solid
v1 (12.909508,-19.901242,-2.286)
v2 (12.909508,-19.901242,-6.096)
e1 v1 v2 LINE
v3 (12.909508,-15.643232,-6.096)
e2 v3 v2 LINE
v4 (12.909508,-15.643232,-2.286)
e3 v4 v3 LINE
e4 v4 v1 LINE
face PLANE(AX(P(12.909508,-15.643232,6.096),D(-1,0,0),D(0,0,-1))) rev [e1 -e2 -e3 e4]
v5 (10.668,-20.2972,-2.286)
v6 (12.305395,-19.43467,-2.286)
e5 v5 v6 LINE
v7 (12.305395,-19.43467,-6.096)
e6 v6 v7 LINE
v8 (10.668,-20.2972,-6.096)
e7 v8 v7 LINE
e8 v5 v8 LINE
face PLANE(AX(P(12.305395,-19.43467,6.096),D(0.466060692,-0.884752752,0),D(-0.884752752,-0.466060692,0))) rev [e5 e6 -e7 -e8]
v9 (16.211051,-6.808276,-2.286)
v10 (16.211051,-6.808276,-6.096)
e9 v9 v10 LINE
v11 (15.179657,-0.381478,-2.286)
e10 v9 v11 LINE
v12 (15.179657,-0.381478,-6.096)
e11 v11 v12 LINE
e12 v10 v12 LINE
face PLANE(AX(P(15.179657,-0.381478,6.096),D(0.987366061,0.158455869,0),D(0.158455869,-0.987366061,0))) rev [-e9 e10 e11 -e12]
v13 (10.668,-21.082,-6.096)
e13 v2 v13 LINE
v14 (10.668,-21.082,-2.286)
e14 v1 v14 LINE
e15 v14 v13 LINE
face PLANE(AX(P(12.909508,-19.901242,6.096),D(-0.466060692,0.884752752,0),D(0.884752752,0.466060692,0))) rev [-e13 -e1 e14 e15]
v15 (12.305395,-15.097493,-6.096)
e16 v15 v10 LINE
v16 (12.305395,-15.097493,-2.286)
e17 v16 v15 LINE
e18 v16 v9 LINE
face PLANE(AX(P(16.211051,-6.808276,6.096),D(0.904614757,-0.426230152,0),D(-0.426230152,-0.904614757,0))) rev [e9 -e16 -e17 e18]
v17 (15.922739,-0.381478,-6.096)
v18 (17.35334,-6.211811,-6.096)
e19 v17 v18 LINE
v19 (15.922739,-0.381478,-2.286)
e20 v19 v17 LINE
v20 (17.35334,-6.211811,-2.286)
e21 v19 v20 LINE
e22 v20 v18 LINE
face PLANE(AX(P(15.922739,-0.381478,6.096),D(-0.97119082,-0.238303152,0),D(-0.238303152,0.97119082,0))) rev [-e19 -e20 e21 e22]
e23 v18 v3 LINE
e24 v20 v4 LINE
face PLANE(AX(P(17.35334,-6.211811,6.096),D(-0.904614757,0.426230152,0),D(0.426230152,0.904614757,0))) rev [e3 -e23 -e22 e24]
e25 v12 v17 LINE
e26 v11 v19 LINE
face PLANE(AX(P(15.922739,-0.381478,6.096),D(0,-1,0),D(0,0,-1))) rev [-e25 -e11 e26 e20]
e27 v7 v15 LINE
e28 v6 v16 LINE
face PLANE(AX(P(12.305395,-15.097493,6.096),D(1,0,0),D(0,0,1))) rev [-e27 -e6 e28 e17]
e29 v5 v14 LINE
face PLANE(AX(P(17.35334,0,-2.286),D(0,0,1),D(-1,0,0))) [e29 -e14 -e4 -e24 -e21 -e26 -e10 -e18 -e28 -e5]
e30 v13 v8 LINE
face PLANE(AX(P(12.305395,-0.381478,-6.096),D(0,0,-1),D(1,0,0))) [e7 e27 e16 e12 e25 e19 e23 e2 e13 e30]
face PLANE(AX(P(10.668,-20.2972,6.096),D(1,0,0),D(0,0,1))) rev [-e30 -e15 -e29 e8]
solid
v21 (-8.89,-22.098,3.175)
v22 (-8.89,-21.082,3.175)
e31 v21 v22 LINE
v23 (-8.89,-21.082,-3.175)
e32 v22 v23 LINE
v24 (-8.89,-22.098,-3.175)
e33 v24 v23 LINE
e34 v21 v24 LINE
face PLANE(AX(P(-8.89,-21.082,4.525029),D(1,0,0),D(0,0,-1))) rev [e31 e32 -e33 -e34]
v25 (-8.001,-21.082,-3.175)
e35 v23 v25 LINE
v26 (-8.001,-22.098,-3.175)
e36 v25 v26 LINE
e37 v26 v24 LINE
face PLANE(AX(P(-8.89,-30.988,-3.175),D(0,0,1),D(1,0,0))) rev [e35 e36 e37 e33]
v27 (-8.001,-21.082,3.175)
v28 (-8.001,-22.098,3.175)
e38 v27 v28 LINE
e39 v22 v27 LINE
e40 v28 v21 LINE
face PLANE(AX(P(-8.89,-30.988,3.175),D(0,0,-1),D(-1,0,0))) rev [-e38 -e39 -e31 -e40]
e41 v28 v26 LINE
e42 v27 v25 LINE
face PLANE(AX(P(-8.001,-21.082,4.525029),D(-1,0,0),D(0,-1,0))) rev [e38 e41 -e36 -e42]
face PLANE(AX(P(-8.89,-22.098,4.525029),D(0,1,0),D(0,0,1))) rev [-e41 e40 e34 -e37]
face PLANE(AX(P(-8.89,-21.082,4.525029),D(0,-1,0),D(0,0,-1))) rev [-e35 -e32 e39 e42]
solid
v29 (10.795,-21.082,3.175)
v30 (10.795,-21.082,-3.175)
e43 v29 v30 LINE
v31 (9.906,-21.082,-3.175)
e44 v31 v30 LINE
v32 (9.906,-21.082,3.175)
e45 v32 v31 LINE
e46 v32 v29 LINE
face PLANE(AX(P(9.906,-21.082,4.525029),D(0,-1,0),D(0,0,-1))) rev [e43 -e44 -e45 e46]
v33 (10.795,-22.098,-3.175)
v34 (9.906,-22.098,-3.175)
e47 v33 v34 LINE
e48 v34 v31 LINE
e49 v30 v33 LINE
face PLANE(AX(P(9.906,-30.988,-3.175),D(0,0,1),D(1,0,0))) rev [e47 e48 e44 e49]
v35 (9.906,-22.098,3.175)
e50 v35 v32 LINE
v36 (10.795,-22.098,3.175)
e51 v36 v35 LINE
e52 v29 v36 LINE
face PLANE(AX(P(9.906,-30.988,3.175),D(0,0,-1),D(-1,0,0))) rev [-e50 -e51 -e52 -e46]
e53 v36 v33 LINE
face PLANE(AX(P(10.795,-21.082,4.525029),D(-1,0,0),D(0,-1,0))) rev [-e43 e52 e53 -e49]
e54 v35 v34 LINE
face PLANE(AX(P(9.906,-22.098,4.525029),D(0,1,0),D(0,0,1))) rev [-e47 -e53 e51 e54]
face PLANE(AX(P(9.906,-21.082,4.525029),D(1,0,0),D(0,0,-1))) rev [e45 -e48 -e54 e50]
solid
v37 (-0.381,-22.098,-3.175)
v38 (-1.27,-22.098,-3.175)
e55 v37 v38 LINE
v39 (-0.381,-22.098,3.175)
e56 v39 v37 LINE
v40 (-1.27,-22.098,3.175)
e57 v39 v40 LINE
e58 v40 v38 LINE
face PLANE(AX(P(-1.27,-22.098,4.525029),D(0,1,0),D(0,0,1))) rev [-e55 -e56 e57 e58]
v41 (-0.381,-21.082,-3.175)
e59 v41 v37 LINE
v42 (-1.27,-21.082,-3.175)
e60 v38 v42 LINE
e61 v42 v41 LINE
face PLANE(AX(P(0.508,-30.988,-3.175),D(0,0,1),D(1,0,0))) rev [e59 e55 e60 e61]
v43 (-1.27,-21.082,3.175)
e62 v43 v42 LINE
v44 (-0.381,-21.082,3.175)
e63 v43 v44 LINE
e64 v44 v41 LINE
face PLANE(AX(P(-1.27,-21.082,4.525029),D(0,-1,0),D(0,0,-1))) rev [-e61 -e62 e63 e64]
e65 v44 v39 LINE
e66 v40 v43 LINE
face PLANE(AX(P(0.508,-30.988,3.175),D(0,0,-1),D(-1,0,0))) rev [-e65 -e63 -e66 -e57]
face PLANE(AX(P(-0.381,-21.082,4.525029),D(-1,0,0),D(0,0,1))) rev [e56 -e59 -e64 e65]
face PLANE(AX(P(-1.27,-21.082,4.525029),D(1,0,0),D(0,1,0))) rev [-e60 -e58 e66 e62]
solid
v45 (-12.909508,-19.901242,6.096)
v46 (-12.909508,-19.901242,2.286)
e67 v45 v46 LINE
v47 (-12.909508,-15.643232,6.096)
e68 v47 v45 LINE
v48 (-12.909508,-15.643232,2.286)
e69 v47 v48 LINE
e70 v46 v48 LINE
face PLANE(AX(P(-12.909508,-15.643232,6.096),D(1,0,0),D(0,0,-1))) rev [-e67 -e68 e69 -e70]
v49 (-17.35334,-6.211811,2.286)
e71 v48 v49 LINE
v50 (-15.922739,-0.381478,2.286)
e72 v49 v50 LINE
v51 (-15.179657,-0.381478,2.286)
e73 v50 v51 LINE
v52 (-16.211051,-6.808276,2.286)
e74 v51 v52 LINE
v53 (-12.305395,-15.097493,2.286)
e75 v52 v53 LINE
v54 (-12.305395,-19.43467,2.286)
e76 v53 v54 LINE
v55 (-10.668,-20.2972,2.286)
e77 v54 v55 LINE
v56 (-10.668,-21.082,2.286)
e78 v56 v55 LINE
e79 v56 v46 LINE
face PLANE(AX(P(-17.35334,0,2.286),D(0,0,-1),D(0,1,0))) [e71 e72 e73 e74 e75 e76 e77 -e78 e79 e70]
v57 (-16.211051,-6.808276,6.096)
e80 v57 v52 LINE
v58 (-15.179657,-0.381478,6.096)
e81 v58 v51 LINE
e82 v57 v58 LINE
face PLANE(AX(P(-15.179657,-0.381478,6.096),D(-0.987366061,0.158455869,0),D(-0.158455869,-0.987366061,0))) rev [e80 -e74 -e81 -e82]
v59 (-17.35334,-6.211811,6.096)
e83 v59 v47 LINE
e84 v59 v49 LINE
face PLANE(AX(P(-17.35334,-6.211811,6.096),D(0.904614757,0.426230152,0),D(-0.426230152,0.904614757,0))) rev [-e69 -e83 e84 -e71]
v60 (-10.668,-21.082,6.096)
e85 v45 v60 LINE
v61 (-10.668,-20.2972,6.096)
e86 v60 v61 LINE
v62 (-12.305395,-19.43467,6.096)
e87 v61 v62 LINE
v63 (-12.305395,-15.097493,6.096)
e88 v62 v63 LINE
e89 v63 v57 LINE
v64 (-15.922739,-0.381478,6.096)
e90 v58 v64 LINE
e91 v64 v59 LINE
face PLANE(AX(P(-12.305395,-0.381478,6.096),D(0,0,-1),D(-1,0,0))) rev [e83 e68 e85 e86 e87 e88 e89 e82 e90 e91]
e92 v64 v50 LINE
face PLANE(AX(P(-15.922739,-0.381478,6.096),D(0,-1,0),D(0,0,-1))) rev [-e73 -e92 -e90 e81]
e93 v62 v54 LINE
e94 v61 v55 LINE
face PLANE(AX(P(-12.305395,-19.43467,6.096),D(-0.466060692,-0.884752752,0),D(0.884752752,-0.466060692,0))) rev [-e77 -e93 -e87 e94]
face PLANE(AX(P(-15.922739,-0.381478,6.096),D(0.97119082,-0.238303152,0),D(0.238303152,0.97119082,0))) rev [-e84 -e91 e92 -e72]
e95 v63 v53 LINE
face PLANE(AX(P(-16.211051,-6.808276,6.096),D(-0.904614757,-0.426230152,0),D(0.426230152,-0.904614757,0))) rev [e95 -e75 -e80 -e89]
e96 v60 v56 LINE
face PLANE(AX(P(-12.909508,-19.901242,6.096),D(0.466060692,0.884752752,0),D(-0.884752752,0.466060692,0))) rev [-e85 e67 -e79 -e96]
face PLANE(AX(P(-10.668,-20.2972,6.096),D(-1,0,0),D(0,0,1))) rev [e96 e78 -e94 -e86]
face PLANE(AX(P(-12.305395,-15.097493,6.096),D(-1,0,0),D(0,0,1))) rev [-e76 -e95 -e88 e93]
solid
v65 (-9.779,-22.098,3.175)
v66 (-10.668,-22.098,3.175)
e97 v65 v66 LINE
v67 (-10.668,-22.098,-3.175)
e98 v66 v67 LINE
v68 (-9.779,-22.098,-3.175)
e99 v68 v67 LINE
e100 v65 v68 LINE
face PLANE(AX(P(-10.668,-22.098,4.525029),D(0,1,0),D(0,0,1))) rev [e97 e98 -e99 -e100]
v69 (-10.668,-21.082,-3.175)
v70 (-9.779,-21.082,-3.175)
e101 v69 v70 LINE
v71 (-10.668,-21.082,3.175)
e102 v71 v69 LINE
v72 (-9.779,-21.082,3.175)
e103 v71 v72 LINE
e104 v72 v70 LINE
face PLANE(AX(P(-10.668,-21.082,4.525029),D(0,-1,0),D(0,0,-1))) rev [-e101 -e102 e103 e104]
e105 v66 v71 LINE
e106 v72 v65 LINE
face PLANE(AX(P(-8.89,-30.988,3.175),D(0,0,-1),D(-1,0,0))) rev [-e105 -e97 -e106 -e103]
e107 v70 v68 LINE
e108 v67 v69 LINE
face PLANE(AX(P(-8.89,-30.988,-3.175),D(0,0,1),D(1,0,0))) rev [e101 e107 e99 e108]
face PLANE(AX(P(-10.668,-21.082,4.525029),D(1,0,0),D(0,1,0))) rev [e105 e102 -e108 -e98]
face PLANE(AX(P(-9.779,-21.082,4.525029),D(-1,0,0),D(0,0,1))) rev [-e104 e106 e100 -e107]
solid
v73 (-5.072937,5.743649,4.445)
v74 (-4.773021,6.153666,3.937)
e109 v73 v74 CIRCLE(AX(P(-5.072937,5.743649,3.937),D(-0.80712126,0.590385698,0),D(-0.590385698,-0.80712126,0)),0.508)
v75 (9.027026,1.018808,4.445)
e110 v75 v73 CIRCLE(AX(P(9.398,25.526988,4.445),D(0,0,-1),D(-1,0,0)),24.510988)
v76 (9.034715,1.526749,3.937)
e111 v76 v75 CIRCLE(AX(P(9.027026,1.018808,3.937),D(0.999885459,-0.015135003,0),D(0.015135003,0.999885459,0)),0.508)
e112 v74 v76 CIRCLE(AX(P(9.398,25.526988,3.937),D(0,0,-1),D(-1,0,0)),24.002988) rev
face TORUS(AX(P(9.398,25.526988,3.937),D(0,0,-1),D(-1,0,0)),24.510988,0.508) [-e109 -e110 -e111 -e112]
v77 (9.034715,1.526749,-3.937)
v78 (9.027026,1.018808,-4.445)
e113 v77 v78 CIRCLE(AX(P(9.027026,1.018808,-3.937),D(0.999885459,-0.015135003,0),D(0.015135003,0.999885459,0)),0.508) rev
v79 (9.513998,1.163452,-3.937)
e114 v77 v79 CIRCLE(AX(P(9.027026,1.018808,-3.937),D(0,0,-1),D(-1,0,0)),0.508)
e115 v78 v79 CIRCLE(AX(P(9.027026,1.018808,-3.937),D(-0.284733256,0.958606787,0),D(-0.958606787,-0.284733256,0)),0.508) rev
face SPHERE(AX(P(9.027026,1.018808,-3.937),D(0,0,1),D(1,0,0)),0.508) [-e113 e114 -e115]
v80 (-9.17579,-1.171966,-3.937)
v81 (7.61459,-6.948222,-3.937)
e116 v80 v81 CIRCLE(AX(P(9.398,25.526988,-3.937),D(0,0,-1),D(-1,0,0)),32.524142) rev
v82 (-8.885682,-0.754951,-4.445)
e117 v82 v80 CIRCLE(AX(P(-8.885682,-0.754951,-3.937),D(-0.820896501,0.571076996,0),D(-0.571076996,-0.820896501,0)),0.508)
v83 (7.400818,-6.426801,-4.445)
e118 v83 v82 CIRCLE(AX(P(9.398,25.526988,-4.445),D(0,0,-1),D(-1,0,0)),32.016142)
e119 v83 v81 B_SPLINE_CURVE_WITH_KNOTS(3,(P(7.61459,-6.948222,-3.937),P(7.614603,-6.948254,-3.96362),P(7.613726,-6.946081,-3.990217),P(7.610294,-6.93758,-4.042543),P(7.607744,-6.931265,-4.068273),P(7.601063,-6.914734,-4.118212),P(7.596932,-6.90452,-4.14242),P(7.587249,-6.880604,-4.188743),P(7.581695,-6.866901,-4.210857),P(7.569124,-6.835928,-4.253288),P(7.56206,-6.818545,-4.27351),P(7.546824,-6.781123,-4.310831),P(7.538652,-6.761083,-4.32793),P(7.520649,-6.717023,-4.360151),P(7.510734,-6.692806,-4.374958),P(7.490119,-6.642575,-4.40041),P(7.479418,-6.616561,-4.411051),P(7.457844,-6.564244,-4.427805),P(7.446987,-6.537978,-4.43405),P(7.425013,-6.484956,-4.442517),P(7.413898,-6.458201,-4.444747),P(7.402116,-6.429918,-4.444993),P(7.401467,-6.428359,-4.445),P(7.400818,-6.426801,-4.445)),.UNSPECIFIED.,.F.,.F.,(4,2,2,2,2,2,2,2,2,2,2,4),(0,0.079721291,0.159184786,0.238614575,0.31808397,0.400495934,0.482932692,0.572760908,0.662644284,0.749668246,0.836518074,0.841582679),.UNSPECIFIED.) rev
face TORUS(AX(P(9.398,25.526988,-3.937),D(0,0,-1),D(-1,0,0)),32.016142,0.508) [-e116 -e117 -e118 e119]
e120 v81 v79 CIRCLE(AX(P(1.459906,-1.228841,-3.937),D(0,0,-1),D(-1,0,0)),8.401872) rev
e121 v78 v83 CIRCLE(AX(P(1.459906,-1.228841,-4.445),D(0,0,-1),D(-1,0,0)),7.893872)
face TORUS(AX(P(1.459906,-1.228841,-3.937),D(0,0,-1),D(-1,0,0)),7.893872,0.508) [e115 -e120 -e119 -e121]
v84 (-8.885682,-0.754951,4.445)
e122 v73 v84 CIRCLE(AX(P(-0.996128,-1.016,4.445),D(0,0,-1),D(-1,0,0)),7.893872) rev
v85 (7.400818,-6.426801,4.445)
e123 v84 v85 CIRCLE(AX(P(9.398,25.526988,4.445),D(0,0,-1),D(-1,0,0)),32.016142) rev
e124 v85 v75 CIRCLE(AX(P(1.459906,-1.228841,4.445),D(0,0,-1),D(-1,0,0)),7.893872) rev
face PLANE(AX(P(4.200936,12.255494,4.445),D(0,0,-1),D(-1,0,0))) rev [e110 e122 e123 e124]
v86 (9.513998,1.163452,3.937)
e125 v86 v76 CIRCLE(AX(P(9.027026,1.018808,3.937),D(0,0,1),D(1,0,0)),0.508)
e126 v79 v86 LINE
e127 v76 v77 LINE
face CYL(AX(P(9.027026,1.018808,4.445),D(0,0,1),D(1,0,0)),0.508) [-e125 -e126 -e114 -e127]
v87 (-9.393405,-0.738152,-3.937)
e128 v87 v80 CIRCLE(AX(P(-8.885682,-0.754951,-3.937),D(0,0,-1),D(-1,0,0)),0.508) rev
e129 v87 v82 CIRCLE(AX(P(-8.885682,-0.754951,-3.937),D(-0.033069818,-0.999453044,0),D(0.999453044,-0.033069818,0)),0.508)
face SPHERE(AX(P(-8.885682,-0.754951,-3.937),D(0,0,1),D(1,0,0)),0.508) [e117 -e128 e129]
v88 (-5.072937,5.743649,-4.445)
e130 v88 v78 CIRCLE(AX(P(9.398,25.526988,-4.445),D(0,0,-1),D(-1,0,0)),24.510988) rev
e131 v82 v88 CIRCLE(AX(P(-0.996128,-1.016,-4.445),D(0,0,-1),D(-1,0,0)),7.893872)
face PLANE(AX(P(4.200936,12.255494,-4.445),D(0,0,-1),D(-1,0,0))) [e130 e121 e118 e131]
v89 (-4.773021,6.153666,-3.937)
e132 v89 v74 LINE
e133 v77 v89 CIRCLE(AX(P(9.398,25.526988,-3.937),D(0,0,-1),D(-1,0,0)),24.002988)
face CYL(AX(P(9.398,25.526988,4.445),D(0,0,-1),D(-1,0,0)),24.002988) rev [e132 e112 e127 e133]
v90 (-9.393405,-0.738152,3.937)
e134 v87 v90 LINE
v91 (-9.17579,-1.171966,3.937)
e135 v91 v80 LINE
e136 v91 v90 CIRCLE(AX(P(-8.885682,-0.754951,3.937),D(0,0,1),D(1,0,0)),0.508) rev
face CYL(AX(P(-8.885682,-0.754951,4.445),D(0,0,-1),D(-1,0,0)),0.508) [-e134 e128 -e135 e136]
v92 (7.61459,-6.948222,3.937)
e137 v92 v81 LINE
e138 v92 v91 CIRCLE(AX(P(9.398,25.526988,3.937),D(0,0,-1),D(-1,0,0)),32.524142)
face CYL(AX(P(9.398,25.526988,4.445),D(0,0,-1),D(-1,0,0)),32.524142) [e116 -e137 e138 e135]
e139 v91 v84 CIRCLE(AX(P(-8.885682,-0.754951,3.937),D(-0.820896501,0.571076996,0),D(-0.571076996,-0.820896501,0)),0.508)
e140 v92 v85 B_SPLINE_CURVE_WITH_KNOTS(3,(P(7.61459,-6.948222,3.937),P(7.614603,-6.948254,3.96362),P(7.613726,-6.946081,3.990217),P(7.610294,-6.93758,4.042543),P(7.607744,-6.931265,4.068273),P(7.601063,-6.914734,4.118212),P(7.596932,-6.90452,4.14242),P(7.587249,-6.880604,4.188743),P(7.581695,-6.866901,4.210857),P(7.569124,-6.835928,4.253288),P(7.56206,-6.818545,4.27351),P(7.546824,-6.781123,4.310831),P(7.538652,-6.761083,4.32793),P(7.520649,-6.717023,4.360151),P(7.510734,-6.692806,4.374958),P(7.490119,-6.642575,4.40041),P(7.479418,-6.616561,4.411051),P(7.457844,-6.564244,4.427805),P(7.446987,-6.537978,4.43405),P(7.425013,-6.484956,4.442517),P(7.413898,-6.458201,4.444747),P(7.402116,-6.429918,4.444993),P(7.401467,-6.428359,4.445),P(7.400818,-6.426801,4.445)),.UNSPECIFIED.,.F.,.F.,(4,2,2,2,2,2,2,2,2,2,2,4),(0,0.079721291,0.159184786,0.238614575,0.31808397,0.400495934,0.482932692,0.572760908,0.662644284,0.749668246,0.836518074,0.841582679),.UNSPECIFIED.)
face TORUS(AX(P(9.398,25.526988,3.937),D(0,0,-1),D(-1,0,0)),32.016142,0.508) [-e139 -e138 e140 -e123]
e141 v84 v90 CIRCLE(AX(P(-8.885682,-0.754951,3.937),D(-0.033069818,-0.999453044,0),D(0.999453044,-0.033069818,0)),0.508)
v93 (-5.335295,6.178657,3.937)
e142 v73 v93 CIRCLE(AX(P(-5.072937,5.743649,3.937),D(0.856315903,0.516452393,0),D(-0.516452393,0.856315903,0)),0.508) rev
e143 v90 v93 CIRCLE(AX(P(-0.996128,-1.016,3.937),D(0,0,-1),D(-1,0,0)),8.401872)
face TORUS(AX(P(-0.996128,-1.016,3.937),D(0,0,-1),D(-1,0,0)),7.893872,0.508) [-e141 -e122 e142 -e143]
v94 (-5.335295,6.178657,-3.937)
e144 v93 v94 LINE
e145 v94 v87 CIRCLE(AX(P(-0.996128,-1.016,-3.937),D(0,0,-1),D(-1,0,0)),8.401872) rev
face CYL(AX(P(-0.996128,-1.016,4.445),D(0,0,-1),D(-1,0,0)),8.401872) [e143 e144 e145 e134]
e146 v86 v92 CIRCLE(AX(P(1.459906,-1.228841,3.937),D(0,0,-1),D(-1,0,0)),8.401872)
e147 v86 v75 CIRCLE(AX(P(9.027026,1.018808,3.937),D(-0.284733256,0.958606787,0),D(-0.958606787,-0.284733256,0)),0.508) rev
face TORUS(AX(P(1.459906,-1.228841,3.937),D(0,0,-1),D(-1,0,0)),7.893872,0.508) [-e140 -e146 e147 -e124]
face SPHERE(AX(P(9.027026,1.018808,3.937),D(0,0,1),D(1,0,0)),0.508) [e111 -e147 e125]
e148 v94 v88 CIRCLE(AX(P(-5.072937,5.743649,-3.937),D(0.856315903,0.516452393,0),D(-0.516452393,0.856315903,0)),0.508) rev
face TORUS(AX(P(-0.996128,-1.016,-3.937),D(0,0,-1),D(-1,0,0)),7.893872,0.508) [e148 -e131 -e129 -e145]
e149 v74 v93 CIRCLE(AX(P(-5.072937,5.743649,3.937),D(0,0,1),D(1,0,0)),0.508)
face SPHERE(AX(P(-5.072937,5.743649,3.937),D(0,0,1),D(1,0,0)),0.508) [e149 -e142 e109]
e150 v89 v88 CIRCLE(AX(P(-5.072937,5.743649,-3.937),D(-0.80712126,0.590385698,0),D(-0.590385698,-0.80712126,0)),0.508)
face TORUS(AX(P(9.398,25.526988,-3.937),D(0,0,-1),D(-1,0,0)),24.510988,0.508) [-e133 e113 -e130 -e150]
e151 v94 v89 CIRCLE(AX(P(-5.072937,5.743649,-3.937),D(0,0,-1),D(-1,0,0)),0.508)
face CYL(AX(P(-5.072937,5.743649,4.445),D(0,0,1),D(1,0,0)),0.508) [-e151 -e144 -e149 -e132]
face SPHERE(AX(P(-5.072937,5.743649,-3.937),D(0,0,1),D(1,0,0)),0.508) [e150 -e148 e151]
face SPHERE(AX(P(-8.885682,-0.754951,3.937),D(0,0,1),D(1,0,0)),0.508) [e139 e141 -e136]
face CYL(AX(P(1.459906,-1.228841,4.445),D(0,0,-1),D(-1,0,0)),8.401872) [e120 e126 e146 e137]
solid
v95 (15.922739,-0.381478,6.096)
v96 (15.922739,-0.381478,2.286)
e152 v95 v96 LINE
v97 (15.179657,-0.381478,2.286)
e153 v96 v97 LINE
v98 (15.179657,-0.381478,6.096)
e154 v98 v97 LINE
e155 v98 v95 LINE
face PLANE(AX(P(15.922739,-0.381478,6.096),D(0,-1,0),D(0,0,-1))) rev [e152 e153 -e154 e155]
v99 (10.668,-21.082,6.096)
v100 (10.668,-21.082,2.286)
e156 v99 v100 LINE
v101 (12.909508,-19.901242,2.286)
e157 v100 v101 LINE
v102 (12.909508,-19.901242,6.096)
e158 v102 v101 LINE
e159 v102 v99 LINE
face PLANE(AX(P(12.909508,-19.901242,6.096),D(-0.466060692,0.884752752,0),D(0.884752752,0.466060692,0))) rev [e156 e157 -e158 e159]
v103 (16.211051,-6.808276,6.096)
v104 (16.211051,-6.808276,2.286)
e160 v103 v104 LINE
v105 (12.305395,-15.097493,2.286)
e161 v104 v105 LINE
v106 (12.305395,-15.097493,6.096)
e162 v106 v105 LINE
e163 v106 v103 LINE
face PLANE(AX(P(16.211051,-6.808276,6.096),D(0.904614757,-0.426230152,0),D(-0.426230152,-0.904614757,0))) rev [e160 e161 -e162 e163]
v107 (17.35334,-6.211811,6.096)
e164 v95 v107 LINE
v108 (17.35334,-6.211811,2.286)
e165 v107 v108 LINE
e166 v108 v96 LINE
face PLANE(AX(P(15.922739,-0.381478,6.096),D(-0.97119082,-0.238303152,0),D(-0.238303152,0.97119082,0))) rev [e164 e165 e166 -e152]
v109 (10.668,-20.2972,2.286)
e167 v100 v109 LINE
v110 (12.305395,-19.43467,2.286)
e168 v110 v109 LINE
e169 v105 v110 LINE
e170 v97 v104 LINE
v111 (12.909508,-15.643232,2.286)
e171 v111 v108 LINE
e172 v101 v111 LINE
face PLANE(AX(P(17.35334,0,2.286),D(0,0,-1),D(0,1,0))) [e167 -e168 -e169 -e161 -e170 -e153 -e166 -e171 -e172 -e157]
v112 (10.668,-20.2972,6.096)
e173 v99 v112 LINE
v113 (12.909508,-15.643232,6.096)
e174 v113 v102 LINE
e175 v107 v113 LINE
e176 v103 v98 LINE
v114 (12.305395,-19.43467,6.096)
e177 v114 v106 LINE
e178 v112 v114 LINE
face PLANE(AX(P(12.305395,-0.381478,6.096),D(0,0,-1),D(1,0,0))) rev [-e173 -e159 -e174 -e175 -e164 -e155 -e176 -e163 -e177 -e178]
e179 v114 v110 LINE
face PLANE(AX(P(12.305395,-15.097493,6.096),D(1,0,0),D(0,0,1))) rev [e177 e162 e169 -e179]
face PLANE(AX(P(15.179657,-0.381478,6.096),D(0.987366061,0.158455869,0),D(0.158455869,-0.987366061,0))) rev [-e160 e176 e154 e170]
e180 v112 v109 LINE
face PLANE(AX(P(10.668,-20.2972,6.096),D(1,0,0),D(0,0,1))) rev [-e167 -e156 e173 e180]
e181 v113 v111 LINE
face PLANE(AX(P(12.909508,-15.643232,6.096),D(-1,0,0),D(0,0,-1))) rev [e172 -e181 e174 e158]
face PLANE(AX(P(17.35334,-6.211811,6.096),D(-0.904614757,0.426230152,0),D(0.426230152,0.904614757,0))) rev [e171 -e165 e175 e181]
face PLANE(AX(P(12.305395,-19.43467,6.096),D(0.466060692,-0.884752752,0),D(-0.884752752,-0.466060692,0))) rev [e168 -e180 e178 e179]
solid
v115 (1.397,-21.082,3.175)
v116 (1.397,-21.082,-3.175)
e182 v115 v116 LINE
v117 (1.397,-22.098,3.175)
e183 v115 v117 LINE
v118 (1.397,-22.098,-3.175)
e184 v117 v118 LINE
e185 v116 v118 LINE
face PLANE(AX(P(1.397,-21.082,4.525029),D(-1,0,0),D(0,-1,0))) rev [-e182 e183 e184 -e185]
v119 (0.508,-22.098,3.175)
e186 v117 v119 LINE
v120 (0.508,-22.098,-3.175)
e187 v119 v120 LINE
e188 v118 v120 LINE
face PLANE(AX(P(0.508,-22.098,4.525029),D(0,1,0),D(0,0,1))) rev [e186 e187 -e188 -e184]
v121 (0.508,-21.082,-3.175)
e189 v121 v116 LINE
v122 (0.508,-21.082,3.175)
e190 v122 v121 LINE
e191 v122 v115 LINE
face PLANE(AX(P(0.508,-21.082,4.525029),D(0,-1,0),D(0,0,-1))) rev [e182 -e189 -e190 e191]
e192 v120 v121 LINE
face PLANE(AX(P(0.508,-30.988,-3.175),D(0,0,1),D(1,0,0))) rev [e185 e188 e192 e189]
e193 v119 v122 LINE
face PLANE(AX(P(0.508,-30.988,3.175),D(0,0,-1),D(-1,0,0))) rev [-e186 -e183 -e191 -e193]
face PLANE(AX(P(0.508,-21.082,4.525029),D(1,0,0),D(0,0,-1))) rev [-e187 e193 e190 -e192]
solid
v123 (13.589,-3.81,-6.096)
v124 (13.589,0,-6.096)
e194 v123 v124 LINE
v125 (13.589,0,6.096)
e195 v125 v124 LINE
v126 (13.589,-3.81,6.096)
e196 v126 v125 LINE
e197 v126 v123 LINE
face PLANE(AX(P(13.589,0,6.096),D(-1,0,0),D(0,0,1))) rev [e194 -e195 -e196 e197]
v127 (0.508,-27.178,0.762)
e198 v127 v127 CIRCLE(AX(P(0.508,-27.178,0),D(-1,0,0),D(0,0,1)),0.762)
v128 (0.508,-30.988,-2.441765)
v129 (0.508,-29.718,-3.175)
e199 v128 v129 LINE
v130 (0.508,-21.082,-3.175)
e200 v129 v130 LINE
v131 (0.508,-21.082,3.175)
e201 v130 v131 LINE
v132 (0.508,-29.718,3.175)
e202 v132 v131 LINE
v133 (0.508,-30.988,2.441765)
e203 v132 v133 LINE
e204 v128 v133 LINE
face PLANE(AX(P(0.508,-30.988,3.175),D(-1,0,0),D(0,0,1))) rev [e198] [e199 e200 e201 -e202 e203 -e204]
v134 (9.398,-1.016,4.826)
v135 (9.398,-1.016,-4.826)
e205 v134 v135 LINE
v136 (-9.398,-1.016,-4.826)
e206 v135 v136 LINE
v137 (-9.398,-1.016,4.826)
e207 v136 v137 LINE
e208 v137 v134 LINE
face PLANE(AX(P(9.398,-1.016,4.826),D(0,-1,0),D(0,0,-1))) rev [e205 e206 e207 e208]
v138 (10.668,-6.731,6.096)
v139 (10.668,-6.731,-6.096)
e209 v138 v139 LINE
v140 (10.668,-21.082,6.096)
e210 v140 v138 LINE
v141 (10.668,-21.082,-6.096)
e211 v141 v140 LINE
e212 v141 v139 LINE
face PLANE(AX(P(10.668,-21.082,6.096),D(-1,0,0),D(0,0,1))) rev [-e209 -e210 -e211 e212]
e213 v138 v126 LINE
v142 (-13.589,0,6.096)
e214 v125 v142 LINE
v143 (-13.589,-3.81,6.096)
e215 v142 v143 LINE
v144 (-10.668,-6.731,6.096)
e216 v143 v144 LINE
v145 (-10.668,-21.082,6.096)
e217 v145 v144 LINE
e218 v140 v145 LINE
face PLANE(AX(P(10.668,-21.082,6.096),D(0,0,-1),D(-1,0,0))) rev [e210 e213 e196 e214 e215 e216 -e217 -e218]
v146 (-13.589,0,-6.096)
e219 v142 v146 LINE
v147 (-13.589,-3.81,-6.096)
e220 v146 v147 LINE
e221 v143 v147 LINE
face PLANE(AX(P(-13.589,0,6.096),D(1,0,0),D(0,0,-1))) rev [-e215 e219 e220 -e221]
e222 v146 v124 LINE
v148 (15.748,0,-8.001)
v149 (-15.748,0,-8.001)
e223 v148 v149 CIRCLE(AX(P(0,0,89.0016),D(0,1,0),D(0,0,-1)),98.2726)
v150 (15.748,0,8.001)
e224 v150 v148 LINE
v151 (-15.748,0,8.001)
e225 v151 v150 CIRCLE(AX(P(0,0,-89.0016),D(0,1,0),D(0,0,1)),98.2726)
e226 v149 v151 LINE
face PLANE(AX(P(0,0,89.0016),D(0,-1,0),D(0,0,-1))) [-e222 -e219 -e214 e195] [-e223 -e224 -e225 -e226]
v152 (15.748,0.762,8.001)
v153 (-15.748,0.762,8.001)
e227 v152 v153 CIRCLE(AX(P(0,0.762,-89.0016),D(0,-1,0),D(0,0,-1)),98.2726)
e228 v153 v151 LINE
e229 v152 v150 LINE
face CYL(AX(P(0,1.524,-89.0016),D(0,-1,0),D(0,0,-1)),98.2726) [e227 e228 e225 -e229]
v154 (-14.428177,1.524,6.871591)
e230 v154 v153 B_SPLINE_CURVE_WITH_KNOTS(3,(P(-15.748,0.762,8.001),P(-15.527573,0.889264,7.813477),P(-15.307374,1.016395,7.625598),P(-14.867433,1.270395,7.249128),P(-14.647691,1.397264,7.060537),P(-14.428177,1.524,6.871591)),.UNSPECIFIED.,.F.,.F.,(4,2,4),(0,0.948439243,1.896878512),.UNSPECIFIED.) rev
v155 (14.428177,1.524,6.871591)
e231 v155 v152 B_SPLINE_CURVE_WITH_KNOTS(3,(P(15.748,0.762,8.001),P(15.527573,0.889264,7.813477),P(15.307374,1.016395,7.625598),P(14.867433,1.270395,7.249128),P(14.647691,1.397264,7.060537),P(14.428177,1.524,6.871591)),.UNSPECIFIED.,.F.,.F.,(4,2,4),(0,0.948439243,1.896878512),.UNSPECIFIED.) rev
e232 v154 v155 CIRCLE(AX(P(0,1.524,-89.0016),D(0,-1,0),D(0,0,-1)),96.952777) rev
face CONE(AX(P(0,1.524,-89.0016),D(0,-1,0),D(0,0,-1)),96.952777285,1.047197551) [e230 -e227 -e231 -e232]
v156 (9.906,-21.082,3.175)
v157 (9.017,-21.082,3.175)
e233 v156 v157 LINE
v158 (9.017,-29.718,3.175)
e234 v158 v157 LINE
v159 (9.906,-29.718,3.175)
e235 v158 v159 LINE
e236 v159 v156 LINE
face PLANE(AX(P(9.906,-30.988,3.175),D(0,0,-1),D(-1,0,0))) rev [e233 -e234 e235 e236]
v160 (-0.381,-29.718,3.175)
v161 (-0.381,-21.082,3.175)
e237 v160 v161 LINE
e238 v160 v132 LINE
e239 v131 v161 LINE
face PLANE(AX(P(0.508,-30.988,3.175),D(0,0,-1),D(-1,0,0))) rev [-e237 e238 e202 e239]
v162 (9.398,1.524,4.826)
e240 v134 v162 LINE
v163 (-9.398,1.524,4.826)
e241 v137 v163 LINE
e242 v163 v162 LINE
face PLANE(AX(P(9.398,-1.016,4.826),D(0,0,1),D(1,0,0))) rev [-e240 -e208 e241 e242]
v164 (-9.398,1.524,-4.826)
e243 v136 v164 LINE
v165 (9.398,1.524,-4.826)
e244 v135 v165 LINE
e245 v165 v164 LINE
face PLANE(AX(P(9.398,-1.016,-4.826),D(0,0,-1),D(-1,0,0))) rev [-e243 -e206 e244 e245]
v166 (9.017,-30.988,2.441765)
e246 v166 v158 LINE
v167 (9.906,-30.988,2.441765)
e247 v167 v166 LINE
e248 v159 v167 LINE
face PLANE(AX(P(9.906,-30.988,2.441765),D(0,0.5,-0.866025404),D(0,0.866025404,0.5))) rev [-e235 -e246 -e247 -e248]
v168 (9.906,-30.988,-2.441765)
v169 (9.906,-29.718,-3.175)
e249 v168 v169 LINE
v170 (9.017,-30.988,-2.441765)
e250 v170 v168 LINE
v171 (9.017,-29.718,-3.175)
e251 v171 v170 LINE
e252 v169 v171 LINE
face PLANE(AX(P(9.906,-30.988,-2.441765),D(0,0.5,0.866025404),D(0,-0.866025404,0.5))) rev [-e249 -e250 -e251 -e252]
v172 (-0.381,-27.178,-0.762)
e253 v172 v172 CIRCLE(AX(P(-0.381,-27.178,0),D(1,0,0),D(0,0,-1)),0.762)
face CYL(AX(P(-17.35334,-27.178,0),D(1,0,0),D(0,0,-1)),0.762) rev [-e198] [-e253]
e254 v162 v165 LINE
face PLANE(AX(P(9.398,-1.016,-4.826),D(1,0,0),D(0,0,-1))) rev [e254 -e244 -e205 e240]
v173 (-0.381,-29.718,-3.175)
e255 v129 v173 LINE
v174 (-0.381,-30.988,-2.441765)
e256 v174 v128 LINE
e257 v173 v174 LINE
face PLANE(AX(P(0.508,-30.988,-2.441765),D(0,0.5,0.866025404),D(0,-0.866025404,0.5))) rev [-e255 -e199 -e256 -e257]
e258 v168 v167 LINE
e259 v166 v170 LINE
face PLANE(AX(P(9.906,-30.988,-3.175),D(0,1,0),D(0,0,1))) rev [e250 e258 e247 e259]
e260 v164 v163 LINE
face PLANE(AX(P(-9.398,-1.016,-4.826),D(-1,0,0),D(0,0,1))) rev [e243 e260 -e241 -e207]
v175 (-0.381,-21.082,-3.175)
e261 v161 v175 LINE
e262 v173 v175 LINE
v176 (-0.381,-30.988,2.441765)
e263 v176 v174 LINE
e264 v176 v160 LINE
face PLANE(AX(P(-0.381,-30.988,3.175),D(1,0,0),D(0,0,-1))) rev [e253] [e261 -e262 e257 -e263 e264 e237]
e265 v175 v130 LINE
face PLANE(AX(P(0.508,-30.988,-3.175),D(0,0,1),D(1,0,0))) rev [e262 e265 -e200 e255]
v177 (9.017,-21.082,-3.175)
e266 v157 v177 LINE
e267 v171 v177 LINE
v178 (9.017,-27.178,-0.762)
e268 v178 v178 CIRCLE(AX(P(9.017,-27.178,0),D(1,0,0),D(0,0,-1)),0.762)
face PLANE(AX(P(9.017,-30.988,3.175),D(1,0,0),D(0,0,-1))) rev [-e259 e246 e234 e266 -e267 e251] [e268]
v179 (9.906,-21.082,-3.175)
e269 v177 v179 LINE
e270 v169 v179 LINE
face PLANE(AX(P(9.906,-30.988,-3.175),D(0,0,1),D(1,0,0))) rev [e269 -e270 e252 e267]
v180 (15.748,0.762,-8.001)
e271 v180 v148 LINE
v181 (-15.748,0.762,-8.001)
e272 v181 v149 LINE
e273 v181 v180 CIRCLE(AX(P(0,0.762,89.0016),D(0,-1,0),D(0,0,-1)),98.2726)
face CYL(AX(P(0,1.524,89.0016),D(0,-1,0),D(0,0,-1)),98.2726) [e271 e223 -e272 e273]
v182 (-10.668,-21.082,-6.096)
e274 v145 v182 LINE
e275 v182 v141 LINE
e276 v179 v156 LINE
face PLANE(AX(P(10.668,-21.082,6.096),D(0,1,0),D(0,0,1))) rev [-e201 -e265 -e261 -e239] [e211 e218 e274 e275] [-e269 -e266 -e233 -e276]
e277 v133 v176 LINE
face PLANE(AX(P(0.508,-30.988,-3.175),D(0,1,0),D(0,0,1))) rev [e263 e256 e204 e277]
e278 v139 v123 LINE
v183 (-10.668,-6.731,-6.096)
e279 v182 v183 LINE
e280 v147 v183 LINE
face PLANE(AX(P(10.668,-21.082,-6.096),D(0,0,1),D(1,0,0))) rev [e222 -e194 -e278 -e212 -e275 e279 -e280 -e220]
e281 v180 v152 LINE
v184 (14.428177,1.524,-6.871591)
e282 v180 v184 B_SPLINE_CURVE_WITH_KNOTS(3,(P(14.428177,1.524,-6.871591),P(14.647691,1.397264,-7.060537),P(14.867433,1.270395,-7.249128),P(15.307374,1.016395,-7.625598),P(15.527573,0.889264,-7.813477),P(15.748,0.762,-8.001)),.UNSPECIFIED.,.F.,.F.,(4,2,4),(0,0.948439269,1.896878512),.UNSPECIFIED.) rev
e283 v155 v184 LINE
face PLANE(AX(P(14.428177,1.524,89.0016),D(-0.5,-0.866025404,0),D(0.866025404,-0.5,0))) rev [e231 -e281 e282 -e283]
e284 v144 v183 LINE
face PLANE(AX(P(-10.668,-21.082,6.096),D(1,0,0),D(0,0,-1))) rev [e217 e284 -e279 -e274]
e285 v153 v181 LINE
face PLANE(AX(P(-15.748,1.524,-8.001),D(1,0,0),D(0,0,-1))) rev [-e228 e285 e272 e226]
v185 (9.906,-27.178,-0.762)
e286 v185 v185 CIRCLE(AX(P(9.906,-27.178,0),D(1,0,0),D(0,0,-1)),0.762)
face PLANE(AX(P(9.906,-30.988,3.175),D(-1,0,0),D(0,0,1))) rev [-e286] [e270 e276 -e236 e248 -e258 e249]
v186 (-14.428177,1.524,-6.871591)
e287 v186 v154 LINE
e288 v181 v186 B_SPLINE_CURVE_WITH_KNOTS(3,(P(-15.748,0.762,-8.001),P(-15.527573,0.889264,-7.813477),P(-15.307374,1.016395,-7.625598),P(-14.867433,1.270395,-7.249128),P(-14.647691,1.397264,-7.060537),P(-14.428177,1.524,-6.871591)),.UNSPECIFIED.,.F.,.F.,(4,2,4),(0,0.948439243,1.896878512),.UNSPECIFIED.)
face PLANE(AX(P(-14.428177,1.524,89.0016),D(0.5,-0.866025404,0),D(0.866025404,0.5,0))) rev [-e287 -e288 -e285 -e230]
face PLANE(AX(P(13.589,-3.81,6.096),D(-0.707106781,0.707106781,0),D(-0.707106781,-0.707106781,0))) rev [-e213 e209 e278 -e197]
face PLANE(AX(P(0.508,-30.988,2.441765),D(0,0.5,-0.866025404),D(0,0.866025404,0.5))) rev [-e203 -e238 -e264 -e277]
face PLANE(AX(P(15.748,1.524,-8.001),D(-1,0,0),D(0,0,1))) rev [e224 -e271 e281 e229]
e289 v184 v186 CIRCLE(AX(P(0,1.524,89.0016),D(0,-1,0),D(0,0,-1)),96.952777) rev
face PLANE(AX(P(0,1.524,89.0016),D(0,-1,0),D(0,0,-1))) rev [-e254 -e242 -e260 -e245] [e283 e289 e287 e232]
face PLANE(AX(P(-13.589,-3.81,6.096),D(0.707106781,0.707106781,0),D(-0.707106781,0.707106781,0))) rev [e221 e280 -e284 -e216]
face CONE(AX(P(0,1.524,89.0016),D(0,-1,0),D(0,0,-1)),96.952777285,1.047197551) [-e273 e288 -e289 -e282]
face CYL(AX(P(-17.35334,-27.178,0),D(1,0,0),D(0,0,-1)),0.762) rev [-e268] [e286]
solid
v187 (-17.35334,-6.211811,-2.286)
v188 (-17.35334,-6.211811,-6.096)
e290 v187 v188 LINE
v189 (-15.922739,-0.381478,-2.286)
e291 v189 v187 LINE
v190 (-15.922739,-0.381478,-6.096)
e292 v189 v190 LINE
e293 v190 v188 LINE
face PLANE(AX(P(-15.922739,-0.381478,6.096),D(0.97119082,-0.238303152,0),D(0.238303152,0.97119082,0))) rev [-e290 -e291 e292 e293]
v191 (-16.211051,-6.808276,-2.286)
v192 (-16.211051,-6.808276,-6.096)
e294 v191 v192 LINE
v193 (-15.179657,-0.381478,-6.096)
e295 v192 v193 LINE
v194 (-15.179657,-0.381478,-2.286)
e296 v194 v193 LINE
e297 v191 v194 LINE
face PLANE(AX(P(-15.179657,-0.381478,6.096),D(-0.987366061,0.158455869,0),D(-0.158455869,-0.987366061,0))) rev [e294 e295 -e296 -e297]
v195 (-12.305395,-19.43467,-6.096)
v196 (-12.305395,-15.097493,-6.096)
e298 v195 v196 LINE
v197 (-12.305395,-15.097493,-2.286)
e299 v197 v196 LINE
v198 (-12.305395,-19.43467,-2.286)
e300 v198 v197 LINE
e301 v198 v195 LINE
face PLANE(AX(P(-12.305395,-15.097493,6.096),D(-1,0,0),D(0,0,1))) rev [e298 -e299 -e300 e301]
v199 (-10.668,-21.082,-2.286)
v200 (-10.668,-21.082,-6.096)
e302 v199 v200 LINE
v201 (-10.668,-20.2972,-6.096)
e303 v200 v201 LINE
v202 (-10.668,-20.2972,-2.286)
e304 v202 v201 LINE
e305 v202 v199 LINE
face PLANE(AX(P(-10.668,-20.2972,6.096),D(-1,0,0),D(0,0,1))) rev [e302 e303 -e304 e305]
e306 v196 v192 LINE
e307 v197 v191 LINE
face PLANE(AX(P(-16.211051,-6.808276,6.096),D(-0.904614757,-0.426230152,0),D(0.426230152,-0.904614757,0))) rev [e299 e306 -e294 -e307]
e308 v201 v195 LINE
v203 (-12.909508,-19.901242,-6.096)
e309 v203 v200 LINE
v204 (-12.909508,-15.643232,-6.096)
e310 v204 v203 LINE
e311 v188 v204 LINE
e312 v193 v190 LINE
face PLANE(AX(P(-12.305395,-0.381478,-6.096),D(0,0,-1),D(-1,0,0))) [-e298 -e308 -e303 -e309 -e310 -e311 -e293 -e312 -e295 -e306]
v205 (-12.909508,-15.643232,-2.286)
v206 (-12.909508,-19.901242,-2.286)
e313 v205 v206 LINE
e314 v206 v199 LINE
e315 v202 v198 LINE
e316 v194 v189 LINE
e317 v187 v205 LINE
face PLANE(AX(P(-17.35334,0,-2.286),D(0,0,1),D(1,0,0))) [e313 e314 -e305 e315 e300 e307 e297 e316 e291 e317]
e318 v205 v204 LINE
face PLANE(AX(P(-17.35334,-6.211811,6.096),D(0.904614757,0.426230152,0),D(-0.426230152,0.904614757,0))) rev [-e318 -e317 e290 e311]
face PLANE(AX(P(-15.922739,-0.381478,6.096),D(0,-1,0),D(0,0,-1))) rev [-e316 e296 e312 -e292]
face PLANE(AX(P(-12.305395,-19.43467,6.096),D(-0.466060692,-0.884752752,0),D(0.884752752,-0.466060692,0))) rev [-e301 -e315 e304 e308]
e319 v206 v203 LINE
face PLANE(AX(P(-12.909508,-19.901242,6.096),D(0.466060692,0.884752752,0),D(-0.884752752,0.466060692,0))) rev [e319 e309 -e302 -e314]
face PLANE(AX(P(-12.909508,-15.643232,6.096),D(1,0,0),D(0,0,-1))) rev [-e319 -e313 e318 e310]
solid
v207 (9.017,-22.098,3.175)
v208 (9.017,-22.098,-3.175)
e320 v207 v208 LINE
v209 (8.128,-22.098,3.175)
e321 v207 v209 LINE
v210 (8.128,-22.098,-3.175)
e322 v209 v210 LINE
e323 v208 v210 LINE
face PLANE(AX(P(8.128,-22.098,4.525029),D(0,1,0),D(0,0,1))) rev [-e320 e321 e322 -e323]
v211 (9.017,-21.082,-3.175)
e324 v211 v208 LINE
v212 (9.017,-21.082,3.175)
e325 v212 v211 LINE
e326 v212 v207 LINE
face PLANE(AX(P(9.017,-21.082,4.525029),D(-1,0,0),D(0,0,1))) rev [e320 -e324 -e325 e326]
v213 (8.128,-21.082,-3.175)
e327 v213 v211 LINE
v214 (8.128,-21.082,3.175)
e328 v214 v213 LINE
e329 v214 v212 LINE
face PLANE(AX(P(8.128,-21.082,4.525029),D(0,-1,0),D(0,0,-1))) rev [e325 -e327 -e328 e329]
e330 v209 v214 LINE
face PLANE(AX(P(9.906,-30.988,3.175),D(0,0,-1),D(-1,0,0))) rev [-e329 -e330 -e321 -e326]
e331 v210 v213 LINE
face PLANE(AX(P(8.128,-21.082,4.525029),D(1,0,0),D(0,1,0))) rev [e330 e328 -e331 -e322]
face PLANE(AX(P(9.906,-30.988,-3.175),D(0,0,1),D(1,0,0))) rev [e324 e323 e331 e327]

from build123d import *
from OCP.BRepFilletAPI import BRepFilletAPI_MakeChamfer

# Parameters (mm, degrees)
EXTRUDE1_DEPTH              = 1.524
SKETCH2_W                   = 21.336
SKETCH2_H                   = 12.192
EXTRUDE2_DEPTH              = 21.082
CHAMFER1_SIZE               = 0.762
CHAMFER1_SIZE2              = 1.319822715
EXTRUDE3_DEPTH              = 6.096
EXTRUDE4_DEPTH              = 6.096
SKETCH5_W                   = 4.572
SKETCH5_H                   = 21.082
CUT_EXTRUDE2_DEPTH          = 36.045787493
SKETCH7_W                   = 0.889
SKETCH7_H                   = 6.35
EXTRUDE5_DEPTH              = 9.906
EXTRUDE6_REACH              = 38.706
SKETCH8_W                   = 0.889
SKETCH8_H                   = 1.016
EXTRUDE6_DIRECTION_2_REACH  = 38.706
CHAMFER2_SIZE               = 1.27
CHAMFER2_SIZE2              = 0.733234842
LPATTERN1_START             = -22.098
LPATTERN1_OUTLINE_W         = 0.889
LPATTERN1_OUTLINE_H         = 6.35
LPATTERN1_DEPTH             = 1.016
LPATTERN2_COUNT             = 2
LPATTERN2_PITCH             = 9.398
CHAMFER2_OF_LPATTERN2_SIZE  = 1.27
CHAMFER2_OF_LPATTERN2_SIZE2 = 0.733234842
SKETCH9_R                   = 0.762
CUT_EXTRUDE3_DEPTH          = 43.299872235
SKETCH10_W                  = 18.796
SKETCH10_H                  = 9.652
CUT_EXTRUDE4_DEPTH          = 2.54
EXTRUDE7_DEPTH              = 4.445
FILLET1_R                   = 0.508


# Read off the part's stored shape, not the designer's step: LPattern1
with BuildPart() as part:
    # Sketch1 → Extrude1 (new body)
    with BuildSketch(Plane(origin=(0, 0, 0), x_dir=(1, 0, 0), z_dir=(0, 1, 0))):
        with BuildLine():
            Line((-15.748, 8.001), (-15.748, -8.001))
            ThreePointArc((-15.748, -8.001), (0, -9.271), (15.748, -8.001))
            Line((15.748, -8.001), (15.748, 8.001))
            ThreePointArc((15.748, 8.001), (0, 9.271), (-15.748, 8.001))
        make_face()
    extrude(amount=EXTRUDE1_DEPTH)

    # Sketch2 → Extrude2 (add)
    with BuildSketch(Plane.XZ):
        Rectangle(SKETCH2_W, SKETCH2_H)
    extrude(amount=EXTRUDE2_DEPTH)

    # Chamfer1: one chamfer whose edges measure the first distance from different faces: ONE call of the kernel's chamfer builder (chamfer() names one face for all edges)
    chamfer1_edges_1 = [part.edges().sort_by_distance(p)[0] for p in [
        (0, 1.524, 9.271),
    ]]
    chamfer1_side_1 = [part.faces().sort_by_distance(p)[0] for p in [
        (0, 0.762, 9.271),
    ]]
    chamfer1_edges_2 = [part.edges().sort_by_distance(p)[0] for p in [
        (15.748, 1.524, 0),
    ]]
    chamfer1_side_2 = [part.faces().sort_by_distance(p)[0] for p in [
        (15.748, 0.762, 0),
    ]]
    chamfer1_edges_3 = [part.edges().sort_by_distance(p)[0] for p in [
        (0, 1.524, -9.271),
    ]]
    chamfer1_side_3 = [part.faces().sort_by_distance(p)[0] for p in [
        (0, 0.762, -9.271),
    ]]
    chamfer1_edges_4 = [part.edges().sort_by_distance(p)[0] for p in [
        (-15.748, 1.524, 0),
    ]]
    chamfer1_side_4 = [part.faces().sort_by_distance(p)[0] for p in [
        (-15.748, 0.762, 0),
    ]]
    chamfer1 = BRepFilletAPI_MakeChamfer(part.part.solid().wrapped)
    for e in chamfer1_edges_1:
        chamfer1.Add(CHAMFER1_SIZE, CHAMFER1_SIZE2, e.wrapped, chamfer1_side_1[0].wrapped)  # the first distance lies on this face
    for e in chamfer1_edges_2:
        chamfer1.Add(CHAMFER1_SIZE, CHAMFER1_SIZE2, e.wrapped, chamfer1_side_2[0].wrapped)  # the first distance lies on this face
    for e in chamfer1_edges_3:
        chamfer1.Add(CHAMFER1_SIZE, CHAMFER1_SIZE2, e.wrapped, chamfer1_side_3[0].wrapped)  # the first distance lies on this face
    for e in chamfer1_edges_4:
        chamfer1.Add(CHAMFER1_SIZE, CHAMFER1_SIZE2, e.wrapped, chamfer1_side_4[0].wrapped)  # the first distance lies on this face
    add(Compound.cast(chamfer1.Shape()), mode=Mode.REPLACE)

    # Sketch3 → Extrude3 (add, symmetric)
    with BuildSketch(Plane.XY):
        Polygon((-13.589, 0), (-13.589, -3.81), (-10.668, -6.731), (-10.668, 0), align=None)
        Polygon((10.668, 0), (13.589, 0), (13.589, -3.81), (10.668, -6.731), align=None)
    extrude(amount=EXTRUDE3_DEPTH, both=True)

    # Sketch7 → Extrude5 (add)
    with BuildSketch(Plane.XZ.offset(21.082)):
        with Locations((9.4615, 0)):
            Rectangle(SKETCH7_W, SKETCH7_H)
    extrude5 = extrude(amount=EXTRUDE5_DEPTH)


with BuildPart() as body_2:
    # Sketch4 → Extrude4 (new, symmetric)
    with BuildSketch(Plane.XY):
        Polygon((-15.922738599, -0.38147822), (-17.353339796, -6.211811304), (-12.909507716, -15.643232471), (-12.909507716, -19.901242285), (-10.668, -21.082), (-10.668, -20.297200236), (-12.305395452, -19.434670387), (-12.305395452, -15.097492601), (-16.211051361, -6.808276188), (-15.179656931, -0.38147822), align=None)
    extrude(amount=EXTRUDE4_DEPTH, both=True)

    # Sketch5 → Cut-Extrude2 (cut, through all)
    with BuildSketch(Plane.ZY.offset(10.668)):
        with Locations((0, -10.541)):
            Rectangle(SKETCH5_W, SKETCH5_H)
    extrude(amount=CUT_EXTRUDE2_DEPTH, mode=Mode.SUBTRACT)


with BuildPart() as cut_extrude2_piece_1:
    # of the separate pieces the step leaves, piece 1, a body of its own (cut_extrude2_pieces)
    add(body_2.part.solids().sort_by_distance((-15.922738599, -0.38147822, 6.096))[0])


with BuildPart() as cut_extrude2_piece_2:
    # of the separate pieces the step leaves, piece 2, a body of its own (cut_extrude2_pieces)
    add(body_2.part.solids().sort_by_distance((-15.922738599, -0.38147822, -2.286))[0])


with BuildPart() as body_4:
    # Mirror1: mirrored copy
    add(cut_extrude2_piece_1.part.mirror(Plane(origin=(0, 0, 0), x_dir=(0, 0, 1), z_dir=(1, 0, 0))))


with BuildPart() as body_5:
    # Mirror1 2: mirrored copy
    add(cut_extrude2_piece_2.part.mirror(Plane(origin=(0, 0, 0), x_dir=(0, 0, 1), z_dir=(1, 0, 0))))


with BuildPart() as body_6:

    # Extrude6: up to this face of the body (flat: up to its plane)
    extrude6_end = Plane(part.part.faces().sort_by_distance((9.4615, -26.035, 3.175))[0])
    # Sketch8 → Extrude6 (new, up to the picked face)
    with BuildSketch(Plane.XY, mode=Mode.PRIVATE) as extrude6_sk1:
        with Locations((10.3505, -21.59)):
            Rectangle(SKETCH8_W, SKETCH8_H)
    extrude6_tool1 = split(extrude(extrude6_sk1.sketch, amount=EXTRUDE6_REACH, mode=Mode.PRIVATE), bisect_by=extrude6_end, keep=Keep.BOTH, mode=Mode.PRIVATE)
    # Sketch8 → Extrude6 (new, up to the picked face)
    with BuildSketch(Plane.XY, mode=Mode.PRIVATE) as extrude6_sk2:
        with Locations((8.5725, -21.59)):
            Rectangle(SKETCH8_W, SKETCH8_H)
    extrude6_tool2 = split(extrude(extrude6_sk2.sketch, amount=EXTRUDE6_REACH, mode=Mode.PRIVATE), bisect_by=extrude6_end, keep=Keep.BOTH, mode=Mode.PRIVATE)
    add(extrude6_tool1.solids().sort_by(Axis((10.3505, -21.59, 0), (0, 0, 1)))[0])
    add(extrude6_tool2.solids().sort_by(Axis((8.5725, -21.59, 0), (0, 0, 1)))[0])


    # Extrude6 direction 2: up to this face of the body (flat: up to its plane)
    extrude6_direction_2_end = Plane(part.part.faces().sort_by_distance((9.4615, -26.035, -3.175))[0])
    # Sketch8 → Extrude6 direction 2 (add, up to the picked face)
    with BuildSketch(Plane.XY, mode=Mode.PRIVATE) as extrude6_direction_2_sk1:
        with Locations((10.3505, -21.59)):
            Rectangle(SKETCH8_W, SKETCH8_H)
    extrude6_direction_2_tool1 = split(extrude(extrude6_direction_2_sk1.sketch, amount=-EXTRUDE6_DIRECTION_2_REACH, mode=Mode.PRIVATE), bisect_by=extrude6_direction_2_end, keep=Keep.BOTH, mode=Mode.PRIVATE)
    # Sketch8 → Extrude6 direction 2 (add, up to the picked face)
    with BuildSketch(Plane.XY, mode=Mode.PRIVATE) as extrude6_direction_2_sk2:
        with Locations((8.5725, -21.59)):
            Rectangle(SKETCH8_W, SKETCH8_H)
    extrude6_direction_2_tool2 = split(extrude(extrude6_direction_2_sk2.sketch, amount=-EXTRUDE6_DIRECTION_2_REACH, mode=Mode.PRIVATE), bisect_by=extrude6_direction_2_end, keep=Keep.BOTH, mode=Mode.PRIVATE)
    add(extrude6_direction_2_tool1.solids().sort_by(Axis((10.3505, -21.59, 0), (0, 0, -1)))[0])
    add(extrude6_direction_2_tool2.solids().sort_by(Axis((8.5725, -21.59, 0), (0, 0, -1)))[0])


with BuildPart() as part_1:
    add(part.part)

    # Chamfer2: one chamfer whose edges measure the first distance from different faces: ONE call of the kernel's chamfer builder (chamfer() names one face for all edges)
    chamfer2_edges_1 = [part_1.edges().sort_by_distance(p)[0] for p in [
        (9.4615, -30.988, 3.175),
    ]]
    chamfer2_side_1 = [part_1.faces().sort_by_distance(p)[0] for p in [
        (9.4615, -26.035, 3.175),
    ]]
    chamfer2_edges_2 = [part_1.edges().sort_by_distance(p)[0] for p in [
        (9.4615, -30.988, -3.175),
    ]]
    chamfer2_side_2 = [part_1.faces().sort_by_distance(p)[0] for p in [
        (9.4615, -26.035, -3.175),
    ]]
    chamfer2 = BRepFilletAPI_MakeChamfer(part_1.part.solid().wrapped)
    for e in chamfer2_edges_1:
        chamfer2.Add(CHAMFER2_SIZE, CHAMFER2_SIZE2, e.wrapped, chamfer2_side_1[0].wrapped)  # the first distance lies on this face
    for e in chamfer2_edges_2:
        chamfer2.Add(CHAMFER2_SIZE, CHAMFER2_SIZE2, e.wrapped, chamfer2_side_2[0].wrapped)  # the first distance lies on this face
    add(Compound.cast(chamfer2.Shape()), mode=Mode.REPLACE)

    # LPattern2: Extrude5 ×2
    with Locations(*[(-i * LPATTERN2_PITCH, 0, 0) for i in range(1, LPATTERN2_COUNT)]):
        add(extrude5)

    # Chamfer2 of LPattern2: one chamfer whose edges measure the first distance from different faces: ONE call of the kernel's chamfer builder (chamfer() names one face for all edges)
    chamfer2_of_lpattern2_edges_1 = [part_1.edges().sort_by_distance(p)[0] for p in [
        (0.0635, -30.988, 3.175),
    ]]
    chamfer2_of_lpattern2_side_1 = [part_1.faces().sort_by_distance(p)[0] for p in [
        (0.0635, -26.035, 3.175),
    ]]
    chamfer2_of_lpattern2_edges_2 = [part_1.edges().sort_by_distance(p)[0] for p in [
        (0.0635, -30.988, -3.175),
    ]]
    chamfer2_of_lpattern2_side_2 = [part_1.faces().sort_by_distance(p)[0] for p in [
        (0.0635, -26.035, -3.175),
    ]]
    chamfer2_of_lpattern2 = BRepFilletAPI_MakeChamfer(part_1.part.solid().wrapped)
    for e in chamfer2_of_lpattern2_edges_1:
        chamfer2_of_lpattern2.Add(CHAMFER2_OF_LPATTERN2_SIZE, CHAMFER2_OF_LPATTERN2_SIZE2, e.wrapped, chamfer2_of_lpattern2_side_1[0].wrapped)  # the first distance lies on this face
    for e in chamfer2_of_lpattern2_edges_2:
        chamfer2_of_lpattern2.Add(CHAMFER2_OF_LPATTERN2_SIZE, CHAMFER2_OF_LPATTERN2_SIZE2, e.wrapped, chamfer2_of_lpattern2_side_2[0].wrapped)  # the first distance lies on this face
    add(Compound.cast(chamfer2_of_lpattern2.Shape()), mode=Mode.REPLACE)

    # Sketch9 → Cut-Extrude3 (cut, through all)
    with BuildSketch(Plane(origin=(9.906, 0, 0), x_dir=(0, 0, -1), z_dir=(1, 0, 0))):
        with Locations((0, -27.178)):
            Circle(SKETCH9_R)
    extrude(amount=-CUT_EXTRUDE3_DEPTH, mode=Mode.SUBTRACT)

    # Sketch10 → Cut-Extrude4 (cut)
    with BuildSketch(Plane(origin=(0, 1.524, 0), x_dir=(-1, 0, 0), z_dir=(0, 1, 0))):
        Rectangle(SKETCH10_W, SKETCH10_H)
    extrude(amount=-CUT_EXTRUDE4_DEPTH, mode=Mode.SUBTRACT)


with BuildPart() as body_7:
    # LPattern1 outline → LPattern1 (new body)
    with BuildSketch(Plane(origin=(0, 0, 0), x_dir=(1, 0, 0), z_dir=(0, 1, 0)).offset(LPATTERN1_START)):
        with Locations((-10.2235, 0)):
            Rectangle(LPATTERN1_OUTLINE_W, LPATTERN1_OUTLINE_H)
        with Locations((-0.8255, 0)):
            Rectangle(LPATTERN1_OUTLINE_W, LPATTERN1_OUTLINE_H)
        with Locations((-8.4455, 0)):
            Rectangle(LPATTERN1_OUTLINE_W, LPATTERN1_OUTLINE_H)
        with Locations((0.9525, 0)):
            Rectangle(LPATTERN1_OUTLINE_W, LPATTERN1_OUTLINE_H)
    extrude(amount=LPATTERN1_DEPTH)


with BuildPart() as body_8:
    # Sketch11 → Extrude7 (new, symmetric)
    with BuildSketch(Plane.XY):
        with BuildLine():
            ThreePointArc((-5.037600642, 6.35), (1.787532835, 2.762449285), (9.398, 1.524))
            ThreePointArc((9.398, 1.524), (9.681599152, -2.959513535), (7.614590321, -6.948222173))
            ThreePointArc((7.614590321, -6.948222173), (-1.310680622, -5.183661388), (-9.398, -1.016))
            ThreePointArc((-9.398, -1.016), (-8.226182947, 3.263925191), (-5.037600642, 6.35))
        make_face()
    extrude(amount=EXTRUDE7_DEPTH, both=True)

    # Fillet1
    fillet1_edges = [body_8.edges().sort_by_distance(p)[0] for p in [
        (9.681599152, -2.959513535, 4.445),
        (1.787532835, 2.762449285, 4.445),
        (-8.226182947, 3.263925191, 4.445),
        (1.787532835, 2.762449285, -4.445),
        (9.681599152, -2.959513535, -4.445),
        (-1.310680622, -5.183661388, -4.445),
        (-8.226182947, 3.263925191, -4.445),
        (-1.310680622, -5.183661388, 4.445),
        (-5.037600642, 6.35, 0),
        (9.398, 1.524, 0),
        (-9.398, -1.016, 0),
    ]]
    fillet(fillet1_edges, radius=FILLET1_R)


solid = Compound([cut_extrude2_piece_1.part, cut_extrude2_piece_2.part, body_4.part, body_5.part, body_6.part, part_1.part, body_7.part, body_8.part])
